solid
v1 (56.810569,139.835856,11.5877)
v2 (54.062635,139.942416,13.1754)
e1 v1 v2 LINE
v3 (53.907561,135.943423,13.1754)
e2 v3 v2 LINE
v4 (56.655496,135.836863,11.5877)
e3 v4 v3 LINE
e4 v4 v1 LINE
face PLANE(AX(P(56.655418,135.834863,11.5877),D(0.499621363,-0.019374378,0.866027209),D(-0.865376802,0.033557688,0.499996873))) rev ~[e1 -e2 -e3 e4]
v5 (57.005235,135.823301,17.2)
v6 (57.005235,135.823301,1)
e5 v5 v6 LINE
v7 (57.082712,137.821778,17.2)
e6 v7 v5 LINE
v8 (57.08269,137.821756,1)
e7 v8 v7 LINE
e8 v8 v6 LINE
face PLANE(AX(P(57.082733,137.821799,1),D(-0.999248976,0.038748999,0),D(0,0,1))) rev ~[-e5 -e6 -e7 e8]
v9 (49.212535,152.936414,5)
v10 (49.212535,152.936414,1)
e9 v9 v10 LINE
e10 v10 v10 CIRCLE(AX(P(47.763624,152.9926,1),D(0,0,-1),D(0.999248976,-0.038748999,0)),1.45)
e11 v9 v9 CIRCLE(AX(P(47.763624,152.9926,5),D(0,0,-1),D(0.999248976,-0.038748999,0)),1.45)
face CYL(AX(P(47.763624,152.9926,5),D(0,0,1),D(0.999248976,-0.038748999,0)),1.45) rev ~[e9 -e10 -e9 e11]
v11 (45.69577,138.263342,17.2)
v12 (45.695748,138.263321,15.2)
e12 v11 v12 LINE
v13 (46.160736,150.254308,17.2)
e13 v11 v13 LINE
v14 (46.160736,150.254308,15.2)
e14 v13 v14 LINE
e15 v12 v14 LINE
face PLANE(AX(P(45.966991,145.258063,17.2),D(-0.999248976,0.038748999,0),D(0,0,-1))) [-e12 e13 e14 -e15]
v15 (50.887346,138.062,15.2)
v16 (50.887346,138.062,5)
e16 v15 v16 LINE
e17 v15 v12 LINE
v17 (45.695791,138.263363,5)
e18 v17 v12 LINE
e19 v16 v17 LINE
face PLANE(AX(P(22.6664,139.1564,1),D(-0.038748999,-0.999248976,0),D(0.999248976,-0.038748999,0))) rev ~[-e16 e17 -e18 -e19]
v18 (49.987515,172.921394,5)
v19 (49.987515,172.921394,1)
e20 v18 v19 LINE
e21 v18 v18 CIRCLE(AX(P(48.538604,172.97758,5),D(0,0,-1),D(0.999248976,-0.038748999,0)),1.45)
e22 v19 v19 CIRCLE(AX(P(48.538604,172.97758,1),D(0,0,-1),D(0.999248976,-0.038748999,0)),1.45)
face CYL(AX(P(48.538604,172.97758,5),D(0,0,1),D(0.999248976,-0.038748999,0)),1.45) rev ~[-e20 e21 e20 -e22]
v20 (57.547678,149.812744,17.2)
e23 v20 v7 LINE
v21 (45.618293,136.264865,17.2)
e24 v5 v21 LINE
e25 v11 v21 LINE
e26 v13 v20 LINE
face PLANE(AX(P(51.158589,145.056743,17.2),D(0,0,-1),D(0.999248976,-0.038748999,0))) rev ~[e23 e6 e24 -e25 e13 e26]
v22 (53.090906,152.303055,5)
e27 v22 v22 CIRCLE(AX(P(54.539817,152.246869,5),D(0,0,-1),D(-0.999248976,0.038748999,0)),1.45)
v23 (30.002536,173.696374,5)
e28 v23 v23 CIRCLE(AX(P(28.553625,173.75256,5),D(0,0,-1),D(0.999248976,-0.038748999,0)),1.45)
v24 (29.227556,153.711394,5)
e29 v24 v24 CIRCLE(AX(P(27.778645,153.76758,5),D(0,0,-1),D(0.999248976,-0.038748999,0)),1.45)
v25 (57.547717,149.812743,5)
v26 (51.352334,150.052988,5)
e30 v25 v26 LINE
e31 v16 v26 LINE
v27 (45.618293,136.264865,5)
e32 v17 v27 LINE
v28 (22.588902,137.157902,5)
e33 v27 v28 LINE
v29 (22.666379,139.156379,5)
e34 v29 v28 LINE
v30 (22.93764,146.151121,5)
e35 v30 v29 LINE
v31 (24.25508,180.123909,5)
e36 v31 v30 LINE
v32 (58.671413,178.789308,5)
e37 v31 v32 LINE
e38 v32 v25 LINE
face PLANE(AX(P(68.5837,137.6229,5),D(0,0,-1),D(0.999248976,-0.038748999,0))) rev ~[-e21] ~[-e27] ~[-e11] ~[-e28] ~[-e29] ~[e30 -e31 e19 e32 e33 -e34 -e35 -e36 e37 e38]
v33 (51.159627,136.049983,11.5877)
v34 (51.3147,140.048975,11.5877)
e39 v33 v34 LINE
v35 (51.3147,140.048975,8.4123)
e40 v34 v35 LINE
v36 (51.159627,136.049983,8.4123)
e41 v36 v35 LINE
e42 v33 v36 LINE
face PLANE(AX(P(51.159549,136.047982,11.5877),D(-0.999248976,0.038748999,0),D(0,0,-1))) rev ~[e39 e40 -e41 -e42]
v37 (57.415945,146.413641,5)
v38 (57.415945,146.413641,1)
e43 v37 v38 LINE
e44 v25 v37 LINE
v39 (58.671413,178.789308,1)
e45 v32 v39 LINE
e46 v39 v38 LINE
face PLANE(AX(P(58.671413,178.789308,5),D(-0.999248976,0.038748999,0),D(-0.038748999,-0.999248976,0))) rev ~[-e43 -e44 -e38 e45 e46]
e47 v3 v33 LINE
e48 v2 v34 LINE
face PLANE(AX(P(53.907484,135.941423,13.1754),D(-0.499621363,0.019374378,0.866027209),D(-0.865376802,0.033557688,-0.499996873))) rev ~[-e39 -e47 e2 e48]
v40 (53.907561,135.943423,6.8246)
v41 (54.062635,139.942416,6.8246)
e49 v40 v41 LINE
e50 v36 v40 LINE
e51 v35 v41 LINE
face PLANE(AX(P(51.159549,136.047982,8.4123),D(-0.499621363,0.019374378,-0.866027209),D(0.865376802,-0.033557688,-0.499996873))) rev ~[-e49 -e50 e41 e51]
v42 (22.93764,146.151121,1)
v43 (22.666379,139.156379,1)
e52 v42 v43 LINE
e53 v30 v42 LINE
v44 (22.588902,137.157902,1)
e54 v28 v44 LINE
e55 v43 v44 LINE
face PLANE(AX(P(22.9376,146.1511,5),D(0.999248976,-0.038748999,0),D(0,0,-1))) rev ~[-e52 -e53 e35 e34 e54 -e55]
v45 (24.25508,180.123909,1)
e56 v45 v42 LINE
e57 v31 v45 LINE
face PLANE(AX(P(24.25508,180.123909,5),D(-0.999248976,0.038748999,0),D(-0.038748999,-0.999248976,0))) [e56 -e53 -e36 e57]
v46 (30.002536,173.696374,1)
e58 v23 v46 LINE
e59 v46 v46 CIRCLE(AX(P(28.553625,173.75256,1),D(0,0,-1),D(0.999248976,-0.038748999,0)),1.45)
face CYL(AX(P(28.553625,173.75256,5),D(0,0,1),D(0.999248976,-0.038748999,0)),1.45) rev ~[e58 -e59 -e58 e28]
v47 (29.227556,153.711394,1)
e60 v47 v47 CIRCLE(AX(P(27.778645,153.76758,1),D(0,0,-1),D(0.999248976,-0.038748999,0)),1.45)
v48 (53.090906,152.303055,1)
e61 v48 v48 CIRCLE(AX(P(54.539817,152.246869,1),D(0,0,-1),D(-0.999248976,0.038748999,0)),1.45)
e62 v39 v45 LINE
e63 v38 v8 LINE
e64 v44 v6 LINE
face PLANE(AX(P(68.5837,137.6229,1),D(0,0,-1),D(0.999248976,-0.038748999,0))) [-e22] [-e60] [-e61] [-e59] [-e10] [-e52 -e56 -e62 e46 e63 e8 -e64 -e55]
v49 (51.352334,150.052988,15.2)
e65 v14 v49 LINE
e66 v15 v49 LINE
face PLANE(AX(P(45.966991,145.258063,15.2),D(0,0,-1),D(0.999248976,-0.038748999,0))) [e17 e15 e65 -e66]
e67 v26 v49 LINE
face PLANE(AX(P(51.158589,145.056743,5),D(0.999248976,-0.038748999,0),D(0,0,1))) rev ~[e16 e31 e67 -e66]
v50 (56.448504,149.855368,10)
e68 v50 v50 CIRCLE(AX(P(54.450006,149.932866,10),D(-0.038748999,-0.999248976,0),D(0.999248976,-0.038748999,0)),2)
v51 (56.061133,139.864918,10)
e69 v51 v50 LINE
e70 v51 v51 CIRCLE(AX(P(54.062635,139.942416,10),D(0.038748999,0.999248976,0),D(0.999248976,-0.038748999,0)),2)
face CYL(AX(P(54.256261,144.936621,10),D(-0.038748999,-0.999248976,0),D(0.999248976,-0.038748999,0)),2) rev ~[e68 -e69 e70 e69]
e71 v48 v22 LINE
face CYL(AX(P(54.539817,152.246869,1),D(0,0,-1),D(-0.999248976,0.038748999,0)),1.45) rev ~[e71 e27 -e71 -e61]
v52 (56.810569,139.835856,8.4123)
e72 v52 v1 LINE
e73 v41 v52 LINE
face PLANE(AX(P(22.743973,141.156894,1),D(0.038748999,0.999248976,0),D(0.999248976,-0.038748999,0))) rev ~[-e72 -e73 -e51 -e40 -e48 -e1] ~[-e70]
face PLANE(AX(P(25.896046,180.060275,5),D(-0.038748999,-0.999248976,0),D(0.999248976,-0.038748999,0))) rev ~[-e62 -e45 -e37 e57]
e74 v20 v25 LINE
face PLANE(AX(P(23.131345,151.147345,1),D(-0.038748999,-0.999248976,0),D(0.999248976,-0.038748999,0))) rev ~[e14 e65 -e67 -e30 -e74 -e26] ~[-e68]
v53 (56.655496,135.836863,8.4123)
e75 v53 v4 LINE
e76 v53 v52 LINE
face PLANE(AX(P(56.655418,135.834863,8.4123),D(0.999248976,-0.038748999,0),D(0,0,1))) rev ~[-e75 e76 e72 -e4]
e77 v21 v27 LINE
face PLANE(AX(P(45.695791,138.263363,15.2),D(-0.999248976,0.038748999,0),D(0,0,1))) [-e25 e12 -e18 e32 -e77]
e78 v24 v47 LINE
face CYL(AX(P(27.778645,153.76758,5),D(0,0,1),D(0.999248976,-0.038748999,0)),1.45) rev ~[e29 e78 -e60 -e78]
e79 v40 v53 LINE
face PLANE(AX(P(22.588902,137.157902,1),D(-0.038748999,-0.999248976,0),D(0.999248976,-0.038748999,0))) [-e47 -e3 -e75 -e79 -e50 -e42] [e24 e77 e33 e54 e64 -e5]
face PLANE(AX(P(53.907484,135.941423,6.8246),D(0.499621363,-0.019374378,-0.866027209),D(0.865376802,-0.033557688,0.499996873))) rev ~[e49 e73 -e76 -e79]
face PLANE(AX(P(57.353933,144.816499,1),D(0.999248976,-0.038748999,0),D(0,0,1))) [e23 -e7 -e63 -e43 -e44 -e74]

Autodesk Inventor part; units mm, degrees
ref_plane "YZ Plane" through (0, 0, 0) normal (1, 0, 0) x (0, 1, 0)
ref_plane "XZ Plane" through (0, 0, 0) normal (0, 1, 0) x (-1, 0, 0)
ref_plane "XY Plane" through (0, 0, 0) normal (0, 0, 1) x (1, 0, 0)
ref_plane "Work Plane3" through (68.5837, 137.6229, 5) normal (0, 0, -1) x (0.999249, -0.038749, 0)
sketch "Sketch3" plane through (68.5837, 137.6229, 5) normal (0, 0, -1) x (0.999249, -0.038749, 0)
  line L0 (-44.3, -40.7514) -> (-37.8, -40.7514) projected
  line L1 (-37.8, -8.3514) -> (-37.8, -40.7514) projected
  line L2 (-44.3, -8.3514) -> (-37.8, -8.3514) projected
  line L3 (-44.3, -8.3514) -> (-44.3, -40.7514) projected
  circle A0 centre (-41.4, -14.5514) radius 1.75 construction
  circle A1 centre (-41.4, -34.5514) radius 1.75 construction
  line L4 (-25, -40.7514) -> (-18.5, -40.7514) projected
  line L5 (-18.5, -8.3514) -> (-18.5, -40.7514) projected
  line L6 (-25, -8.3514) -> (-18.5, -8.3514) projected
  line L7 (-25, -8.3514) -> (-25, -40.7514) projected
  circle A2 centre (-21.4, -14.5514) radius 1.75 construction
  circle A3 centre (-21.4, -34.5514) radius 1.75 construction
  line L8 (-18.5, -40.7514) -> (-45.9422, -40.7514)
  line L9 (-45.9422, -40.7514) -> (-45.9422, -6.7531)
  line L10 (-45.9422, -6.7531) -> (-18.5, -6.7531)
  line L11 (-18.5, -6.7531) -> (-18.5, -40.7514)
  circle A4 centre (-41.4, -14.5514) radius 1.75 projected
  circle A5 centre (-41.4, -34.5514) radius 1.45
  circle A6 centre (-41.4, -14.5514) radius 1.45
  circle A7 centre (-21.4, -14.5514) radius 1.45
  circle A8 centre (-21.4, -34.5514) radius 1.45
  line L12 (-17.9, -8.3514) -> (-17.9, -40.7514) projected
  line L13 (-18.5, -40.7514) -> (-11.5, -40.7514)
  line L14 (-11.5, -40.7514) -> (-11.5, -8.3514)
  line L15 (-11.5, -8.3514) -> (-18.5, -8.3514)
  line L16 (-18.5, -8.3514) -> (-18.5, -40.7514)
  point P0 (-63.1994, 140.177)
  dimension "d12" = 2.9
  dimension "d13" = 2.9
  dimension "d14" = 2.9
  dimension "d15" = 2.9
  dimension "d16" = 7
extrude "Extrusion3" add sketch "Sketch3" along normal blind 4 contours L3 L2 L1 L0 | L8 L9 L10 L11 L6 L7 L1 L2 L3 | L7 L6 L5 L4 | L5 L15 L12 L13 | L12 L15 L14 L13 | A4
ref_plane "Work Plane4" through (22.9376, 146.1511, 1) normal (-0.038749, -0.999249, 0) x (0.999249, -0.038749, 0)
sketch "Sketch4" plane through (22.9376, 146.1511, 1) normal (-0.038749, -0.999249, 0) x (0.999249, -0.038749, 0)
  line L0 (27.4422, 4) -> (0, 4) projected
  line L1 (0, 4) -> (0, 0) projected
  line L2 (27.4422, 0) -> (0, 0) projected
  arc A0 (20.387, 12.6266) -> (19.8094, 12.1273) centre (20.8422, 11.5162) ccw construction
  arc A1 (19.616, 12.0055) -> (19.8094, 12.1273) centre (19.5942, 12.2545) ccw construction
  line L3 (19.616, 12.0055) -> (19.2704, 11.9753) construction
  arc A2 (19.2704, 11.9753) -> (19.0422, 11.7262) centre (19.2922, 11.7262) ccw construction
  line L4 (19.0422, 11.7262) -> (19.0422, 11.2738) construction
  arc A3 (19.0422, 11.2738) -> (19.2704, 11.0247) centre (19.2922, 11.2738) ccw construction
  line L5 (19.2704, 11.0247) -> (19.637, 10.9927) construction
  arc A4 (19.8267, 10.8768) -> (19.637, 10.9927) centre (19.6152, 10.7436) ccw construction
  arc A5 (19.8267, 10.8768) -> (20.387, 10.4059) centre (20.8422, 11.5162) ccw construction
  arc A6 (20.5422, 10.1746) -> (20.387, 10.4059) centre (20.2922, 10.1746) ccw construction
  line L6 (20.5422, 10.1746) -> (20.5422, 9.5) construction
  line L7 (20.5422, 9.5) -> (20.0422, 9) construction
  line L8 (20.0422, 9) -> (9.0422, 9) construction
  line L9 (9.0422, 9) -> (8.5422, 9.5) construction
  line L10 (8.5422, 9.5) -> (8.5422, 10.1746) construction
  arc A7 (8.6974, 10.4059) -> (8.5422, 10.1746) centre (8.7922, 10.1746) ccw construction
  arc A8 (8.6974, 10.4059) -> (9.2577, 10.8768) centre (8.2422, 11.5162) ccw construction
  arc A9 (9.4474, 10.9927) -> (9.2577, 10.8768) centre (9.4692, 10.7436) ccw construction
  line L11 (9.4474, 10.9927) -> (9.814, 11.0247) construction
  arc A10 (9.814, 11.0247) -> (10.0422, 11.2738) centre (9.7922, 11.2738) ccw construction
  line L12 (10.0422, 11.2738) -> (10.0422, 11.7262) construction
  arc A11 (10.0422, 11.7262) -> (9.814, 11.9753) centre (9.7922, 11.7262) ccw construction
  line L13 (9.814, 11.9753) -> (9.4684, 12.0055) construction
  arc A12 (9.275, 12.1273) -> (9.4684, 12.0055) centre (9.4902, 12.2545) ccw construction
  arc A13 (9.275, 12.1273) -> (8.6974, 12.6266) centre (8.2422, 11.5162) ccw construction
  arc A14 (8.5422, 12.8579) -> (8.6974, 12.6266) centre (8.7922, 12.8579) ccw construction
  line L14 (8.5422, 12.8579) -> (8.5422, 14) construction
  line L15 (8.5422, 14) -> (1.6422, 14) construction
  line L16 (1.6422, 14) -> (1.0422, 13.4) construction
  line L17 (1.0422, 13.4) -> (1.0422, 10) construction
  arc A15 (1.0422, 9.2) -> (1.0422, 10) centre (0.7422, 9.6) ccw construction
  line L18 (1.0422, 9.2) -> (1.0422, 4.6) construction
  line L19 (1.0422, 4.6) -> (1.6422, 4) construction
  line L20 (1.6422, 4) -> (8.1422, 4) construction
  line L21 (8.1422, 4) -> (8.5422, 4.4) construction
  line L22 (8.5422, 4.4) -> (20.5422, 4.4) construction
  line L23 (20.5422, 4.4) -> (20.9422, 4) construction
  line L24 (20.9422, 4) -> (27.4422, 4) construction
  line L25 (27.4422, 4) -> (28.0422, 4.6) construction
  line L26 (28.0422, 4.6) -> (28.0422, 13.4) construction
  line L27 (28.0422, 13.4) -> (27.4422, 14) construction
  line L28 (27.4422, 14) -> (20.5422, 14) construction
  line L29 (20.5422, 14) -> (20.5422, 12.8579) construction
  arc A16 (20.387, 12.6266) -> (20.5422, 12.8579) centre (20.2922, 12.8579) ccw construction
  line L30 (0, 4) -> (34.4422, 4) projected
  line L31 (34.4422, 4) -> (28.2422, 4)
  line L32 (28.2422, 4) -> (28.2422, 16.2)
  line L33 (28.2422, 16.2) -> (34.4422, 16.2)
  line L34 (34.4422, 16.2) -> (34.4422, 4)
  line L35 (28.2422, 16.2) -> (23.0467, 16.2)
  line L36 (23.0467, 16.2) -> (23.0467, 14.2)
  line L37 (23.0467, 14.2) -> (28.2422, 14.2)
  line L38 (28.2422, 14.2) -> (28.2422, 16.2)
  circle A17 centre (31.3422, 9) radius 2
  line L39 (27.4422, 4) -> (27.4422, 0) projected
  line L40 (27.4422, 0) -> (34.4422, 0)
  line L41 (34.4422, 0) -> (34.4422, 4)
  line L42 (34.4422, 4) -> (27.4422, 4)
  line L43 (27.4422, 4) -> (27.4422, 0)
  point P0 (-17.2572, -1)
  dimension "d17" = 0.2
  dimension "d18" = 0.2
  dimension "d19" = 2
  dimension "d20" = 4
extrude "Extrusion4" add sketch "Sketch4" against normal blind 5
ref_plane "Work Plane5" through (22.9376, 146.1511, 1) normal (-0.038749, -0.999249, 0) x (0.999249, -0.038749, 0)
sketch "Sketch6" plane through (22.9376, 146.1511, 1) normal (-0.038749, -0.999249, 0) x (0.999249, -0.038749, 0)
  line L0 (27.4422, 4) -> (0, 4) projected
  line L1 (0, 4) -> (0, 0) projected
  line L2 (27.4422, 0) -> (0, 0) projected
  line L3 (27.4422, 4) -> (27.4422, 0) projected
  line L4 (28.2422, 14.2) -> (23.0467, 14.2) projected
  line L5 (23.0467, 14.2) -> (28.2422, 14.2)
  line L6 (28.2422, 14.2) -> (28.2422, 4)
  line L7 (28.2422, 4) -> (23.0467, 4)
  line L8 (23.0467, 4) -> (23.0467, 14.2)
  line L9 (27.4422, 4) -> (28.2422, 4) projected
  line L10 (27.4422, 4) -> (27.4422, 0) projected
  line L11 (34.4422, 0) -> (27.4422, 0) projected
  line L12 (34.4422, 4) -> (34.4422, 0) projected
  line L13 (28.2422, 4) -> (34.4422, 4) projected
  circle A0 centre (31.3422, 9) radius 2 projected
  line L14 (34.4422, 16.2) -> (23.0467, 16.2) projected
  line L15 (23.0467, 16.2) -> (23.0467, 14.2) projected
  line L16 (23.0467, 14.2) -> (28.2422, 14.2) projected
  line L17 (28.2422, 4) -> (28.2422, 14.2) projected
  line L18 (34.4422, 16.2) -> (34.4422, 0) projected
  line L19 (28.2422, 4) -> (0, 4) projected
  line L20 (0, 4) -> (0, 0) projected
  line L21 (0, 0) -> (34.4422, 0) projected
  point P0 (-17.2572, -1)
extrude "Extrusion6" add sketch "Sketch6" along normal blind 7 contours L3 L2 L1 L0 | L7 L13 L12 L11 L3 | L6 L4 L15 L14 L18 L13
ref_plane "Work Plane6" through (22.6664, 139.1564, 1) normal (-0.038749, -0.999249, 0) x (0.999249, -0.038749, 0)
sketch "Sketch7" plane through (22.6664, 139.1564, 1) normal (-0.038749, -0.999249, 0) x (0.999249, -0.038749, 0)
  circle A0 centre (31.3422, 9) radius 2 projected
  line L0 (28.2422, 4) -> (0, 4) projected
  line L1 (0, 4) -> (0, 0) projected
  line L2 (0, 0) -> (34.4422, 0) projected
  line L3 (23.0467, 14.2) -> (23.0467, 16.2) projected
  line L4 (28.2422, 4) -> (34.4422, 4) projected
  line L5 (23.0467, 14.2) -> (28.2422, 14.2)
  line L6 (28.2422, 14.2) -> (28.2422, 4)
  line L7 (28.2422, 4) -> (23.0467, 4)
  line L8 (23.0467, 4) -> (23.0467, 14.2)
  line L9 (34.4422, 0) -> (34.4422, 16.2) projected
  line L10 (34.4422, 16.2) -> (23.0467, 16.2) projected
  line L11 (23.0467, 16.2) -> (23.0467, 14.2) projected
  line L12 (23.0467, 14.2) -> (28.2422, 14.2) projected
  line L13 (28.2422, 14.2) -> (28.2422, 4) projected
  point P0 (-17.2572, -1)
extrude "Extrusion7" add sketch "Sketch7" along normal blind 2
sketch "Sketch5" plane through (22.5889, 137.1579, 1) normal (0.038749, 0.999249, 0) x (0.999249, -0.038749, 0)
  circle A0 centre (31.3422, -9) radius 2 projected
  line L0 (28.5922, -10.5877) -> (28.5922, -7.4123)
  line L1 (28.5922, -7.4123) -> (31.3422, -5.8246)
  line L2 (31.3422, -5.8246) -> (34.0922, -7.4123)
  line L3 (34.0922, -7.4123) -> (34.0922, -10.5877)
  line L4 (34.0922, -10.5877) -> (31.3422, -12.1754)
  line L5 (31.3422, -12.1754) -> (28.5922, -10.5877)
  point P0 (-17.2572, 1)
  point P1 (31.3422, -9)
  dimension "d23" = 0
  dimension "d24" = 5.5
extrude "Extrusion5" cut sketch "Sketch5" along normal blind 4
sketch "Sketch8" plane through (68.5837, 137.6229, 1) normal (0, 0, -1) x (-0.999249, 0.038749, 0)
  line L0 (22.8955, 11.7531) -> (11.5, 11.7531) projected
  line L1 (12.6, 1.7531) -> (16.6, 1.7531) projected
  circle A0 centre (14.6, 14.0688) radius 1.45
  point P0 (63.1994, -140.177)
  dimension "d31" = 2.9
extrude "Extrusion8" cut sketch "Sketch8" against normal up to surface
sketch "Sketch9" plane through (22.5889, 137.1579, 1) normal (-0.038749, -0.999249, 0) x (0.999249, -0.038749, 0)
  circle A0 centre (15.7007, 11.4189) radius 1.45 projected
  point P0 (-17.2572, -1)
extrude "Extrusion9" cut sketch "Sketch9" against normal blind 5
equation "\"d32\" = d31"
properties part number "30_cellSTORM_translation_y"
